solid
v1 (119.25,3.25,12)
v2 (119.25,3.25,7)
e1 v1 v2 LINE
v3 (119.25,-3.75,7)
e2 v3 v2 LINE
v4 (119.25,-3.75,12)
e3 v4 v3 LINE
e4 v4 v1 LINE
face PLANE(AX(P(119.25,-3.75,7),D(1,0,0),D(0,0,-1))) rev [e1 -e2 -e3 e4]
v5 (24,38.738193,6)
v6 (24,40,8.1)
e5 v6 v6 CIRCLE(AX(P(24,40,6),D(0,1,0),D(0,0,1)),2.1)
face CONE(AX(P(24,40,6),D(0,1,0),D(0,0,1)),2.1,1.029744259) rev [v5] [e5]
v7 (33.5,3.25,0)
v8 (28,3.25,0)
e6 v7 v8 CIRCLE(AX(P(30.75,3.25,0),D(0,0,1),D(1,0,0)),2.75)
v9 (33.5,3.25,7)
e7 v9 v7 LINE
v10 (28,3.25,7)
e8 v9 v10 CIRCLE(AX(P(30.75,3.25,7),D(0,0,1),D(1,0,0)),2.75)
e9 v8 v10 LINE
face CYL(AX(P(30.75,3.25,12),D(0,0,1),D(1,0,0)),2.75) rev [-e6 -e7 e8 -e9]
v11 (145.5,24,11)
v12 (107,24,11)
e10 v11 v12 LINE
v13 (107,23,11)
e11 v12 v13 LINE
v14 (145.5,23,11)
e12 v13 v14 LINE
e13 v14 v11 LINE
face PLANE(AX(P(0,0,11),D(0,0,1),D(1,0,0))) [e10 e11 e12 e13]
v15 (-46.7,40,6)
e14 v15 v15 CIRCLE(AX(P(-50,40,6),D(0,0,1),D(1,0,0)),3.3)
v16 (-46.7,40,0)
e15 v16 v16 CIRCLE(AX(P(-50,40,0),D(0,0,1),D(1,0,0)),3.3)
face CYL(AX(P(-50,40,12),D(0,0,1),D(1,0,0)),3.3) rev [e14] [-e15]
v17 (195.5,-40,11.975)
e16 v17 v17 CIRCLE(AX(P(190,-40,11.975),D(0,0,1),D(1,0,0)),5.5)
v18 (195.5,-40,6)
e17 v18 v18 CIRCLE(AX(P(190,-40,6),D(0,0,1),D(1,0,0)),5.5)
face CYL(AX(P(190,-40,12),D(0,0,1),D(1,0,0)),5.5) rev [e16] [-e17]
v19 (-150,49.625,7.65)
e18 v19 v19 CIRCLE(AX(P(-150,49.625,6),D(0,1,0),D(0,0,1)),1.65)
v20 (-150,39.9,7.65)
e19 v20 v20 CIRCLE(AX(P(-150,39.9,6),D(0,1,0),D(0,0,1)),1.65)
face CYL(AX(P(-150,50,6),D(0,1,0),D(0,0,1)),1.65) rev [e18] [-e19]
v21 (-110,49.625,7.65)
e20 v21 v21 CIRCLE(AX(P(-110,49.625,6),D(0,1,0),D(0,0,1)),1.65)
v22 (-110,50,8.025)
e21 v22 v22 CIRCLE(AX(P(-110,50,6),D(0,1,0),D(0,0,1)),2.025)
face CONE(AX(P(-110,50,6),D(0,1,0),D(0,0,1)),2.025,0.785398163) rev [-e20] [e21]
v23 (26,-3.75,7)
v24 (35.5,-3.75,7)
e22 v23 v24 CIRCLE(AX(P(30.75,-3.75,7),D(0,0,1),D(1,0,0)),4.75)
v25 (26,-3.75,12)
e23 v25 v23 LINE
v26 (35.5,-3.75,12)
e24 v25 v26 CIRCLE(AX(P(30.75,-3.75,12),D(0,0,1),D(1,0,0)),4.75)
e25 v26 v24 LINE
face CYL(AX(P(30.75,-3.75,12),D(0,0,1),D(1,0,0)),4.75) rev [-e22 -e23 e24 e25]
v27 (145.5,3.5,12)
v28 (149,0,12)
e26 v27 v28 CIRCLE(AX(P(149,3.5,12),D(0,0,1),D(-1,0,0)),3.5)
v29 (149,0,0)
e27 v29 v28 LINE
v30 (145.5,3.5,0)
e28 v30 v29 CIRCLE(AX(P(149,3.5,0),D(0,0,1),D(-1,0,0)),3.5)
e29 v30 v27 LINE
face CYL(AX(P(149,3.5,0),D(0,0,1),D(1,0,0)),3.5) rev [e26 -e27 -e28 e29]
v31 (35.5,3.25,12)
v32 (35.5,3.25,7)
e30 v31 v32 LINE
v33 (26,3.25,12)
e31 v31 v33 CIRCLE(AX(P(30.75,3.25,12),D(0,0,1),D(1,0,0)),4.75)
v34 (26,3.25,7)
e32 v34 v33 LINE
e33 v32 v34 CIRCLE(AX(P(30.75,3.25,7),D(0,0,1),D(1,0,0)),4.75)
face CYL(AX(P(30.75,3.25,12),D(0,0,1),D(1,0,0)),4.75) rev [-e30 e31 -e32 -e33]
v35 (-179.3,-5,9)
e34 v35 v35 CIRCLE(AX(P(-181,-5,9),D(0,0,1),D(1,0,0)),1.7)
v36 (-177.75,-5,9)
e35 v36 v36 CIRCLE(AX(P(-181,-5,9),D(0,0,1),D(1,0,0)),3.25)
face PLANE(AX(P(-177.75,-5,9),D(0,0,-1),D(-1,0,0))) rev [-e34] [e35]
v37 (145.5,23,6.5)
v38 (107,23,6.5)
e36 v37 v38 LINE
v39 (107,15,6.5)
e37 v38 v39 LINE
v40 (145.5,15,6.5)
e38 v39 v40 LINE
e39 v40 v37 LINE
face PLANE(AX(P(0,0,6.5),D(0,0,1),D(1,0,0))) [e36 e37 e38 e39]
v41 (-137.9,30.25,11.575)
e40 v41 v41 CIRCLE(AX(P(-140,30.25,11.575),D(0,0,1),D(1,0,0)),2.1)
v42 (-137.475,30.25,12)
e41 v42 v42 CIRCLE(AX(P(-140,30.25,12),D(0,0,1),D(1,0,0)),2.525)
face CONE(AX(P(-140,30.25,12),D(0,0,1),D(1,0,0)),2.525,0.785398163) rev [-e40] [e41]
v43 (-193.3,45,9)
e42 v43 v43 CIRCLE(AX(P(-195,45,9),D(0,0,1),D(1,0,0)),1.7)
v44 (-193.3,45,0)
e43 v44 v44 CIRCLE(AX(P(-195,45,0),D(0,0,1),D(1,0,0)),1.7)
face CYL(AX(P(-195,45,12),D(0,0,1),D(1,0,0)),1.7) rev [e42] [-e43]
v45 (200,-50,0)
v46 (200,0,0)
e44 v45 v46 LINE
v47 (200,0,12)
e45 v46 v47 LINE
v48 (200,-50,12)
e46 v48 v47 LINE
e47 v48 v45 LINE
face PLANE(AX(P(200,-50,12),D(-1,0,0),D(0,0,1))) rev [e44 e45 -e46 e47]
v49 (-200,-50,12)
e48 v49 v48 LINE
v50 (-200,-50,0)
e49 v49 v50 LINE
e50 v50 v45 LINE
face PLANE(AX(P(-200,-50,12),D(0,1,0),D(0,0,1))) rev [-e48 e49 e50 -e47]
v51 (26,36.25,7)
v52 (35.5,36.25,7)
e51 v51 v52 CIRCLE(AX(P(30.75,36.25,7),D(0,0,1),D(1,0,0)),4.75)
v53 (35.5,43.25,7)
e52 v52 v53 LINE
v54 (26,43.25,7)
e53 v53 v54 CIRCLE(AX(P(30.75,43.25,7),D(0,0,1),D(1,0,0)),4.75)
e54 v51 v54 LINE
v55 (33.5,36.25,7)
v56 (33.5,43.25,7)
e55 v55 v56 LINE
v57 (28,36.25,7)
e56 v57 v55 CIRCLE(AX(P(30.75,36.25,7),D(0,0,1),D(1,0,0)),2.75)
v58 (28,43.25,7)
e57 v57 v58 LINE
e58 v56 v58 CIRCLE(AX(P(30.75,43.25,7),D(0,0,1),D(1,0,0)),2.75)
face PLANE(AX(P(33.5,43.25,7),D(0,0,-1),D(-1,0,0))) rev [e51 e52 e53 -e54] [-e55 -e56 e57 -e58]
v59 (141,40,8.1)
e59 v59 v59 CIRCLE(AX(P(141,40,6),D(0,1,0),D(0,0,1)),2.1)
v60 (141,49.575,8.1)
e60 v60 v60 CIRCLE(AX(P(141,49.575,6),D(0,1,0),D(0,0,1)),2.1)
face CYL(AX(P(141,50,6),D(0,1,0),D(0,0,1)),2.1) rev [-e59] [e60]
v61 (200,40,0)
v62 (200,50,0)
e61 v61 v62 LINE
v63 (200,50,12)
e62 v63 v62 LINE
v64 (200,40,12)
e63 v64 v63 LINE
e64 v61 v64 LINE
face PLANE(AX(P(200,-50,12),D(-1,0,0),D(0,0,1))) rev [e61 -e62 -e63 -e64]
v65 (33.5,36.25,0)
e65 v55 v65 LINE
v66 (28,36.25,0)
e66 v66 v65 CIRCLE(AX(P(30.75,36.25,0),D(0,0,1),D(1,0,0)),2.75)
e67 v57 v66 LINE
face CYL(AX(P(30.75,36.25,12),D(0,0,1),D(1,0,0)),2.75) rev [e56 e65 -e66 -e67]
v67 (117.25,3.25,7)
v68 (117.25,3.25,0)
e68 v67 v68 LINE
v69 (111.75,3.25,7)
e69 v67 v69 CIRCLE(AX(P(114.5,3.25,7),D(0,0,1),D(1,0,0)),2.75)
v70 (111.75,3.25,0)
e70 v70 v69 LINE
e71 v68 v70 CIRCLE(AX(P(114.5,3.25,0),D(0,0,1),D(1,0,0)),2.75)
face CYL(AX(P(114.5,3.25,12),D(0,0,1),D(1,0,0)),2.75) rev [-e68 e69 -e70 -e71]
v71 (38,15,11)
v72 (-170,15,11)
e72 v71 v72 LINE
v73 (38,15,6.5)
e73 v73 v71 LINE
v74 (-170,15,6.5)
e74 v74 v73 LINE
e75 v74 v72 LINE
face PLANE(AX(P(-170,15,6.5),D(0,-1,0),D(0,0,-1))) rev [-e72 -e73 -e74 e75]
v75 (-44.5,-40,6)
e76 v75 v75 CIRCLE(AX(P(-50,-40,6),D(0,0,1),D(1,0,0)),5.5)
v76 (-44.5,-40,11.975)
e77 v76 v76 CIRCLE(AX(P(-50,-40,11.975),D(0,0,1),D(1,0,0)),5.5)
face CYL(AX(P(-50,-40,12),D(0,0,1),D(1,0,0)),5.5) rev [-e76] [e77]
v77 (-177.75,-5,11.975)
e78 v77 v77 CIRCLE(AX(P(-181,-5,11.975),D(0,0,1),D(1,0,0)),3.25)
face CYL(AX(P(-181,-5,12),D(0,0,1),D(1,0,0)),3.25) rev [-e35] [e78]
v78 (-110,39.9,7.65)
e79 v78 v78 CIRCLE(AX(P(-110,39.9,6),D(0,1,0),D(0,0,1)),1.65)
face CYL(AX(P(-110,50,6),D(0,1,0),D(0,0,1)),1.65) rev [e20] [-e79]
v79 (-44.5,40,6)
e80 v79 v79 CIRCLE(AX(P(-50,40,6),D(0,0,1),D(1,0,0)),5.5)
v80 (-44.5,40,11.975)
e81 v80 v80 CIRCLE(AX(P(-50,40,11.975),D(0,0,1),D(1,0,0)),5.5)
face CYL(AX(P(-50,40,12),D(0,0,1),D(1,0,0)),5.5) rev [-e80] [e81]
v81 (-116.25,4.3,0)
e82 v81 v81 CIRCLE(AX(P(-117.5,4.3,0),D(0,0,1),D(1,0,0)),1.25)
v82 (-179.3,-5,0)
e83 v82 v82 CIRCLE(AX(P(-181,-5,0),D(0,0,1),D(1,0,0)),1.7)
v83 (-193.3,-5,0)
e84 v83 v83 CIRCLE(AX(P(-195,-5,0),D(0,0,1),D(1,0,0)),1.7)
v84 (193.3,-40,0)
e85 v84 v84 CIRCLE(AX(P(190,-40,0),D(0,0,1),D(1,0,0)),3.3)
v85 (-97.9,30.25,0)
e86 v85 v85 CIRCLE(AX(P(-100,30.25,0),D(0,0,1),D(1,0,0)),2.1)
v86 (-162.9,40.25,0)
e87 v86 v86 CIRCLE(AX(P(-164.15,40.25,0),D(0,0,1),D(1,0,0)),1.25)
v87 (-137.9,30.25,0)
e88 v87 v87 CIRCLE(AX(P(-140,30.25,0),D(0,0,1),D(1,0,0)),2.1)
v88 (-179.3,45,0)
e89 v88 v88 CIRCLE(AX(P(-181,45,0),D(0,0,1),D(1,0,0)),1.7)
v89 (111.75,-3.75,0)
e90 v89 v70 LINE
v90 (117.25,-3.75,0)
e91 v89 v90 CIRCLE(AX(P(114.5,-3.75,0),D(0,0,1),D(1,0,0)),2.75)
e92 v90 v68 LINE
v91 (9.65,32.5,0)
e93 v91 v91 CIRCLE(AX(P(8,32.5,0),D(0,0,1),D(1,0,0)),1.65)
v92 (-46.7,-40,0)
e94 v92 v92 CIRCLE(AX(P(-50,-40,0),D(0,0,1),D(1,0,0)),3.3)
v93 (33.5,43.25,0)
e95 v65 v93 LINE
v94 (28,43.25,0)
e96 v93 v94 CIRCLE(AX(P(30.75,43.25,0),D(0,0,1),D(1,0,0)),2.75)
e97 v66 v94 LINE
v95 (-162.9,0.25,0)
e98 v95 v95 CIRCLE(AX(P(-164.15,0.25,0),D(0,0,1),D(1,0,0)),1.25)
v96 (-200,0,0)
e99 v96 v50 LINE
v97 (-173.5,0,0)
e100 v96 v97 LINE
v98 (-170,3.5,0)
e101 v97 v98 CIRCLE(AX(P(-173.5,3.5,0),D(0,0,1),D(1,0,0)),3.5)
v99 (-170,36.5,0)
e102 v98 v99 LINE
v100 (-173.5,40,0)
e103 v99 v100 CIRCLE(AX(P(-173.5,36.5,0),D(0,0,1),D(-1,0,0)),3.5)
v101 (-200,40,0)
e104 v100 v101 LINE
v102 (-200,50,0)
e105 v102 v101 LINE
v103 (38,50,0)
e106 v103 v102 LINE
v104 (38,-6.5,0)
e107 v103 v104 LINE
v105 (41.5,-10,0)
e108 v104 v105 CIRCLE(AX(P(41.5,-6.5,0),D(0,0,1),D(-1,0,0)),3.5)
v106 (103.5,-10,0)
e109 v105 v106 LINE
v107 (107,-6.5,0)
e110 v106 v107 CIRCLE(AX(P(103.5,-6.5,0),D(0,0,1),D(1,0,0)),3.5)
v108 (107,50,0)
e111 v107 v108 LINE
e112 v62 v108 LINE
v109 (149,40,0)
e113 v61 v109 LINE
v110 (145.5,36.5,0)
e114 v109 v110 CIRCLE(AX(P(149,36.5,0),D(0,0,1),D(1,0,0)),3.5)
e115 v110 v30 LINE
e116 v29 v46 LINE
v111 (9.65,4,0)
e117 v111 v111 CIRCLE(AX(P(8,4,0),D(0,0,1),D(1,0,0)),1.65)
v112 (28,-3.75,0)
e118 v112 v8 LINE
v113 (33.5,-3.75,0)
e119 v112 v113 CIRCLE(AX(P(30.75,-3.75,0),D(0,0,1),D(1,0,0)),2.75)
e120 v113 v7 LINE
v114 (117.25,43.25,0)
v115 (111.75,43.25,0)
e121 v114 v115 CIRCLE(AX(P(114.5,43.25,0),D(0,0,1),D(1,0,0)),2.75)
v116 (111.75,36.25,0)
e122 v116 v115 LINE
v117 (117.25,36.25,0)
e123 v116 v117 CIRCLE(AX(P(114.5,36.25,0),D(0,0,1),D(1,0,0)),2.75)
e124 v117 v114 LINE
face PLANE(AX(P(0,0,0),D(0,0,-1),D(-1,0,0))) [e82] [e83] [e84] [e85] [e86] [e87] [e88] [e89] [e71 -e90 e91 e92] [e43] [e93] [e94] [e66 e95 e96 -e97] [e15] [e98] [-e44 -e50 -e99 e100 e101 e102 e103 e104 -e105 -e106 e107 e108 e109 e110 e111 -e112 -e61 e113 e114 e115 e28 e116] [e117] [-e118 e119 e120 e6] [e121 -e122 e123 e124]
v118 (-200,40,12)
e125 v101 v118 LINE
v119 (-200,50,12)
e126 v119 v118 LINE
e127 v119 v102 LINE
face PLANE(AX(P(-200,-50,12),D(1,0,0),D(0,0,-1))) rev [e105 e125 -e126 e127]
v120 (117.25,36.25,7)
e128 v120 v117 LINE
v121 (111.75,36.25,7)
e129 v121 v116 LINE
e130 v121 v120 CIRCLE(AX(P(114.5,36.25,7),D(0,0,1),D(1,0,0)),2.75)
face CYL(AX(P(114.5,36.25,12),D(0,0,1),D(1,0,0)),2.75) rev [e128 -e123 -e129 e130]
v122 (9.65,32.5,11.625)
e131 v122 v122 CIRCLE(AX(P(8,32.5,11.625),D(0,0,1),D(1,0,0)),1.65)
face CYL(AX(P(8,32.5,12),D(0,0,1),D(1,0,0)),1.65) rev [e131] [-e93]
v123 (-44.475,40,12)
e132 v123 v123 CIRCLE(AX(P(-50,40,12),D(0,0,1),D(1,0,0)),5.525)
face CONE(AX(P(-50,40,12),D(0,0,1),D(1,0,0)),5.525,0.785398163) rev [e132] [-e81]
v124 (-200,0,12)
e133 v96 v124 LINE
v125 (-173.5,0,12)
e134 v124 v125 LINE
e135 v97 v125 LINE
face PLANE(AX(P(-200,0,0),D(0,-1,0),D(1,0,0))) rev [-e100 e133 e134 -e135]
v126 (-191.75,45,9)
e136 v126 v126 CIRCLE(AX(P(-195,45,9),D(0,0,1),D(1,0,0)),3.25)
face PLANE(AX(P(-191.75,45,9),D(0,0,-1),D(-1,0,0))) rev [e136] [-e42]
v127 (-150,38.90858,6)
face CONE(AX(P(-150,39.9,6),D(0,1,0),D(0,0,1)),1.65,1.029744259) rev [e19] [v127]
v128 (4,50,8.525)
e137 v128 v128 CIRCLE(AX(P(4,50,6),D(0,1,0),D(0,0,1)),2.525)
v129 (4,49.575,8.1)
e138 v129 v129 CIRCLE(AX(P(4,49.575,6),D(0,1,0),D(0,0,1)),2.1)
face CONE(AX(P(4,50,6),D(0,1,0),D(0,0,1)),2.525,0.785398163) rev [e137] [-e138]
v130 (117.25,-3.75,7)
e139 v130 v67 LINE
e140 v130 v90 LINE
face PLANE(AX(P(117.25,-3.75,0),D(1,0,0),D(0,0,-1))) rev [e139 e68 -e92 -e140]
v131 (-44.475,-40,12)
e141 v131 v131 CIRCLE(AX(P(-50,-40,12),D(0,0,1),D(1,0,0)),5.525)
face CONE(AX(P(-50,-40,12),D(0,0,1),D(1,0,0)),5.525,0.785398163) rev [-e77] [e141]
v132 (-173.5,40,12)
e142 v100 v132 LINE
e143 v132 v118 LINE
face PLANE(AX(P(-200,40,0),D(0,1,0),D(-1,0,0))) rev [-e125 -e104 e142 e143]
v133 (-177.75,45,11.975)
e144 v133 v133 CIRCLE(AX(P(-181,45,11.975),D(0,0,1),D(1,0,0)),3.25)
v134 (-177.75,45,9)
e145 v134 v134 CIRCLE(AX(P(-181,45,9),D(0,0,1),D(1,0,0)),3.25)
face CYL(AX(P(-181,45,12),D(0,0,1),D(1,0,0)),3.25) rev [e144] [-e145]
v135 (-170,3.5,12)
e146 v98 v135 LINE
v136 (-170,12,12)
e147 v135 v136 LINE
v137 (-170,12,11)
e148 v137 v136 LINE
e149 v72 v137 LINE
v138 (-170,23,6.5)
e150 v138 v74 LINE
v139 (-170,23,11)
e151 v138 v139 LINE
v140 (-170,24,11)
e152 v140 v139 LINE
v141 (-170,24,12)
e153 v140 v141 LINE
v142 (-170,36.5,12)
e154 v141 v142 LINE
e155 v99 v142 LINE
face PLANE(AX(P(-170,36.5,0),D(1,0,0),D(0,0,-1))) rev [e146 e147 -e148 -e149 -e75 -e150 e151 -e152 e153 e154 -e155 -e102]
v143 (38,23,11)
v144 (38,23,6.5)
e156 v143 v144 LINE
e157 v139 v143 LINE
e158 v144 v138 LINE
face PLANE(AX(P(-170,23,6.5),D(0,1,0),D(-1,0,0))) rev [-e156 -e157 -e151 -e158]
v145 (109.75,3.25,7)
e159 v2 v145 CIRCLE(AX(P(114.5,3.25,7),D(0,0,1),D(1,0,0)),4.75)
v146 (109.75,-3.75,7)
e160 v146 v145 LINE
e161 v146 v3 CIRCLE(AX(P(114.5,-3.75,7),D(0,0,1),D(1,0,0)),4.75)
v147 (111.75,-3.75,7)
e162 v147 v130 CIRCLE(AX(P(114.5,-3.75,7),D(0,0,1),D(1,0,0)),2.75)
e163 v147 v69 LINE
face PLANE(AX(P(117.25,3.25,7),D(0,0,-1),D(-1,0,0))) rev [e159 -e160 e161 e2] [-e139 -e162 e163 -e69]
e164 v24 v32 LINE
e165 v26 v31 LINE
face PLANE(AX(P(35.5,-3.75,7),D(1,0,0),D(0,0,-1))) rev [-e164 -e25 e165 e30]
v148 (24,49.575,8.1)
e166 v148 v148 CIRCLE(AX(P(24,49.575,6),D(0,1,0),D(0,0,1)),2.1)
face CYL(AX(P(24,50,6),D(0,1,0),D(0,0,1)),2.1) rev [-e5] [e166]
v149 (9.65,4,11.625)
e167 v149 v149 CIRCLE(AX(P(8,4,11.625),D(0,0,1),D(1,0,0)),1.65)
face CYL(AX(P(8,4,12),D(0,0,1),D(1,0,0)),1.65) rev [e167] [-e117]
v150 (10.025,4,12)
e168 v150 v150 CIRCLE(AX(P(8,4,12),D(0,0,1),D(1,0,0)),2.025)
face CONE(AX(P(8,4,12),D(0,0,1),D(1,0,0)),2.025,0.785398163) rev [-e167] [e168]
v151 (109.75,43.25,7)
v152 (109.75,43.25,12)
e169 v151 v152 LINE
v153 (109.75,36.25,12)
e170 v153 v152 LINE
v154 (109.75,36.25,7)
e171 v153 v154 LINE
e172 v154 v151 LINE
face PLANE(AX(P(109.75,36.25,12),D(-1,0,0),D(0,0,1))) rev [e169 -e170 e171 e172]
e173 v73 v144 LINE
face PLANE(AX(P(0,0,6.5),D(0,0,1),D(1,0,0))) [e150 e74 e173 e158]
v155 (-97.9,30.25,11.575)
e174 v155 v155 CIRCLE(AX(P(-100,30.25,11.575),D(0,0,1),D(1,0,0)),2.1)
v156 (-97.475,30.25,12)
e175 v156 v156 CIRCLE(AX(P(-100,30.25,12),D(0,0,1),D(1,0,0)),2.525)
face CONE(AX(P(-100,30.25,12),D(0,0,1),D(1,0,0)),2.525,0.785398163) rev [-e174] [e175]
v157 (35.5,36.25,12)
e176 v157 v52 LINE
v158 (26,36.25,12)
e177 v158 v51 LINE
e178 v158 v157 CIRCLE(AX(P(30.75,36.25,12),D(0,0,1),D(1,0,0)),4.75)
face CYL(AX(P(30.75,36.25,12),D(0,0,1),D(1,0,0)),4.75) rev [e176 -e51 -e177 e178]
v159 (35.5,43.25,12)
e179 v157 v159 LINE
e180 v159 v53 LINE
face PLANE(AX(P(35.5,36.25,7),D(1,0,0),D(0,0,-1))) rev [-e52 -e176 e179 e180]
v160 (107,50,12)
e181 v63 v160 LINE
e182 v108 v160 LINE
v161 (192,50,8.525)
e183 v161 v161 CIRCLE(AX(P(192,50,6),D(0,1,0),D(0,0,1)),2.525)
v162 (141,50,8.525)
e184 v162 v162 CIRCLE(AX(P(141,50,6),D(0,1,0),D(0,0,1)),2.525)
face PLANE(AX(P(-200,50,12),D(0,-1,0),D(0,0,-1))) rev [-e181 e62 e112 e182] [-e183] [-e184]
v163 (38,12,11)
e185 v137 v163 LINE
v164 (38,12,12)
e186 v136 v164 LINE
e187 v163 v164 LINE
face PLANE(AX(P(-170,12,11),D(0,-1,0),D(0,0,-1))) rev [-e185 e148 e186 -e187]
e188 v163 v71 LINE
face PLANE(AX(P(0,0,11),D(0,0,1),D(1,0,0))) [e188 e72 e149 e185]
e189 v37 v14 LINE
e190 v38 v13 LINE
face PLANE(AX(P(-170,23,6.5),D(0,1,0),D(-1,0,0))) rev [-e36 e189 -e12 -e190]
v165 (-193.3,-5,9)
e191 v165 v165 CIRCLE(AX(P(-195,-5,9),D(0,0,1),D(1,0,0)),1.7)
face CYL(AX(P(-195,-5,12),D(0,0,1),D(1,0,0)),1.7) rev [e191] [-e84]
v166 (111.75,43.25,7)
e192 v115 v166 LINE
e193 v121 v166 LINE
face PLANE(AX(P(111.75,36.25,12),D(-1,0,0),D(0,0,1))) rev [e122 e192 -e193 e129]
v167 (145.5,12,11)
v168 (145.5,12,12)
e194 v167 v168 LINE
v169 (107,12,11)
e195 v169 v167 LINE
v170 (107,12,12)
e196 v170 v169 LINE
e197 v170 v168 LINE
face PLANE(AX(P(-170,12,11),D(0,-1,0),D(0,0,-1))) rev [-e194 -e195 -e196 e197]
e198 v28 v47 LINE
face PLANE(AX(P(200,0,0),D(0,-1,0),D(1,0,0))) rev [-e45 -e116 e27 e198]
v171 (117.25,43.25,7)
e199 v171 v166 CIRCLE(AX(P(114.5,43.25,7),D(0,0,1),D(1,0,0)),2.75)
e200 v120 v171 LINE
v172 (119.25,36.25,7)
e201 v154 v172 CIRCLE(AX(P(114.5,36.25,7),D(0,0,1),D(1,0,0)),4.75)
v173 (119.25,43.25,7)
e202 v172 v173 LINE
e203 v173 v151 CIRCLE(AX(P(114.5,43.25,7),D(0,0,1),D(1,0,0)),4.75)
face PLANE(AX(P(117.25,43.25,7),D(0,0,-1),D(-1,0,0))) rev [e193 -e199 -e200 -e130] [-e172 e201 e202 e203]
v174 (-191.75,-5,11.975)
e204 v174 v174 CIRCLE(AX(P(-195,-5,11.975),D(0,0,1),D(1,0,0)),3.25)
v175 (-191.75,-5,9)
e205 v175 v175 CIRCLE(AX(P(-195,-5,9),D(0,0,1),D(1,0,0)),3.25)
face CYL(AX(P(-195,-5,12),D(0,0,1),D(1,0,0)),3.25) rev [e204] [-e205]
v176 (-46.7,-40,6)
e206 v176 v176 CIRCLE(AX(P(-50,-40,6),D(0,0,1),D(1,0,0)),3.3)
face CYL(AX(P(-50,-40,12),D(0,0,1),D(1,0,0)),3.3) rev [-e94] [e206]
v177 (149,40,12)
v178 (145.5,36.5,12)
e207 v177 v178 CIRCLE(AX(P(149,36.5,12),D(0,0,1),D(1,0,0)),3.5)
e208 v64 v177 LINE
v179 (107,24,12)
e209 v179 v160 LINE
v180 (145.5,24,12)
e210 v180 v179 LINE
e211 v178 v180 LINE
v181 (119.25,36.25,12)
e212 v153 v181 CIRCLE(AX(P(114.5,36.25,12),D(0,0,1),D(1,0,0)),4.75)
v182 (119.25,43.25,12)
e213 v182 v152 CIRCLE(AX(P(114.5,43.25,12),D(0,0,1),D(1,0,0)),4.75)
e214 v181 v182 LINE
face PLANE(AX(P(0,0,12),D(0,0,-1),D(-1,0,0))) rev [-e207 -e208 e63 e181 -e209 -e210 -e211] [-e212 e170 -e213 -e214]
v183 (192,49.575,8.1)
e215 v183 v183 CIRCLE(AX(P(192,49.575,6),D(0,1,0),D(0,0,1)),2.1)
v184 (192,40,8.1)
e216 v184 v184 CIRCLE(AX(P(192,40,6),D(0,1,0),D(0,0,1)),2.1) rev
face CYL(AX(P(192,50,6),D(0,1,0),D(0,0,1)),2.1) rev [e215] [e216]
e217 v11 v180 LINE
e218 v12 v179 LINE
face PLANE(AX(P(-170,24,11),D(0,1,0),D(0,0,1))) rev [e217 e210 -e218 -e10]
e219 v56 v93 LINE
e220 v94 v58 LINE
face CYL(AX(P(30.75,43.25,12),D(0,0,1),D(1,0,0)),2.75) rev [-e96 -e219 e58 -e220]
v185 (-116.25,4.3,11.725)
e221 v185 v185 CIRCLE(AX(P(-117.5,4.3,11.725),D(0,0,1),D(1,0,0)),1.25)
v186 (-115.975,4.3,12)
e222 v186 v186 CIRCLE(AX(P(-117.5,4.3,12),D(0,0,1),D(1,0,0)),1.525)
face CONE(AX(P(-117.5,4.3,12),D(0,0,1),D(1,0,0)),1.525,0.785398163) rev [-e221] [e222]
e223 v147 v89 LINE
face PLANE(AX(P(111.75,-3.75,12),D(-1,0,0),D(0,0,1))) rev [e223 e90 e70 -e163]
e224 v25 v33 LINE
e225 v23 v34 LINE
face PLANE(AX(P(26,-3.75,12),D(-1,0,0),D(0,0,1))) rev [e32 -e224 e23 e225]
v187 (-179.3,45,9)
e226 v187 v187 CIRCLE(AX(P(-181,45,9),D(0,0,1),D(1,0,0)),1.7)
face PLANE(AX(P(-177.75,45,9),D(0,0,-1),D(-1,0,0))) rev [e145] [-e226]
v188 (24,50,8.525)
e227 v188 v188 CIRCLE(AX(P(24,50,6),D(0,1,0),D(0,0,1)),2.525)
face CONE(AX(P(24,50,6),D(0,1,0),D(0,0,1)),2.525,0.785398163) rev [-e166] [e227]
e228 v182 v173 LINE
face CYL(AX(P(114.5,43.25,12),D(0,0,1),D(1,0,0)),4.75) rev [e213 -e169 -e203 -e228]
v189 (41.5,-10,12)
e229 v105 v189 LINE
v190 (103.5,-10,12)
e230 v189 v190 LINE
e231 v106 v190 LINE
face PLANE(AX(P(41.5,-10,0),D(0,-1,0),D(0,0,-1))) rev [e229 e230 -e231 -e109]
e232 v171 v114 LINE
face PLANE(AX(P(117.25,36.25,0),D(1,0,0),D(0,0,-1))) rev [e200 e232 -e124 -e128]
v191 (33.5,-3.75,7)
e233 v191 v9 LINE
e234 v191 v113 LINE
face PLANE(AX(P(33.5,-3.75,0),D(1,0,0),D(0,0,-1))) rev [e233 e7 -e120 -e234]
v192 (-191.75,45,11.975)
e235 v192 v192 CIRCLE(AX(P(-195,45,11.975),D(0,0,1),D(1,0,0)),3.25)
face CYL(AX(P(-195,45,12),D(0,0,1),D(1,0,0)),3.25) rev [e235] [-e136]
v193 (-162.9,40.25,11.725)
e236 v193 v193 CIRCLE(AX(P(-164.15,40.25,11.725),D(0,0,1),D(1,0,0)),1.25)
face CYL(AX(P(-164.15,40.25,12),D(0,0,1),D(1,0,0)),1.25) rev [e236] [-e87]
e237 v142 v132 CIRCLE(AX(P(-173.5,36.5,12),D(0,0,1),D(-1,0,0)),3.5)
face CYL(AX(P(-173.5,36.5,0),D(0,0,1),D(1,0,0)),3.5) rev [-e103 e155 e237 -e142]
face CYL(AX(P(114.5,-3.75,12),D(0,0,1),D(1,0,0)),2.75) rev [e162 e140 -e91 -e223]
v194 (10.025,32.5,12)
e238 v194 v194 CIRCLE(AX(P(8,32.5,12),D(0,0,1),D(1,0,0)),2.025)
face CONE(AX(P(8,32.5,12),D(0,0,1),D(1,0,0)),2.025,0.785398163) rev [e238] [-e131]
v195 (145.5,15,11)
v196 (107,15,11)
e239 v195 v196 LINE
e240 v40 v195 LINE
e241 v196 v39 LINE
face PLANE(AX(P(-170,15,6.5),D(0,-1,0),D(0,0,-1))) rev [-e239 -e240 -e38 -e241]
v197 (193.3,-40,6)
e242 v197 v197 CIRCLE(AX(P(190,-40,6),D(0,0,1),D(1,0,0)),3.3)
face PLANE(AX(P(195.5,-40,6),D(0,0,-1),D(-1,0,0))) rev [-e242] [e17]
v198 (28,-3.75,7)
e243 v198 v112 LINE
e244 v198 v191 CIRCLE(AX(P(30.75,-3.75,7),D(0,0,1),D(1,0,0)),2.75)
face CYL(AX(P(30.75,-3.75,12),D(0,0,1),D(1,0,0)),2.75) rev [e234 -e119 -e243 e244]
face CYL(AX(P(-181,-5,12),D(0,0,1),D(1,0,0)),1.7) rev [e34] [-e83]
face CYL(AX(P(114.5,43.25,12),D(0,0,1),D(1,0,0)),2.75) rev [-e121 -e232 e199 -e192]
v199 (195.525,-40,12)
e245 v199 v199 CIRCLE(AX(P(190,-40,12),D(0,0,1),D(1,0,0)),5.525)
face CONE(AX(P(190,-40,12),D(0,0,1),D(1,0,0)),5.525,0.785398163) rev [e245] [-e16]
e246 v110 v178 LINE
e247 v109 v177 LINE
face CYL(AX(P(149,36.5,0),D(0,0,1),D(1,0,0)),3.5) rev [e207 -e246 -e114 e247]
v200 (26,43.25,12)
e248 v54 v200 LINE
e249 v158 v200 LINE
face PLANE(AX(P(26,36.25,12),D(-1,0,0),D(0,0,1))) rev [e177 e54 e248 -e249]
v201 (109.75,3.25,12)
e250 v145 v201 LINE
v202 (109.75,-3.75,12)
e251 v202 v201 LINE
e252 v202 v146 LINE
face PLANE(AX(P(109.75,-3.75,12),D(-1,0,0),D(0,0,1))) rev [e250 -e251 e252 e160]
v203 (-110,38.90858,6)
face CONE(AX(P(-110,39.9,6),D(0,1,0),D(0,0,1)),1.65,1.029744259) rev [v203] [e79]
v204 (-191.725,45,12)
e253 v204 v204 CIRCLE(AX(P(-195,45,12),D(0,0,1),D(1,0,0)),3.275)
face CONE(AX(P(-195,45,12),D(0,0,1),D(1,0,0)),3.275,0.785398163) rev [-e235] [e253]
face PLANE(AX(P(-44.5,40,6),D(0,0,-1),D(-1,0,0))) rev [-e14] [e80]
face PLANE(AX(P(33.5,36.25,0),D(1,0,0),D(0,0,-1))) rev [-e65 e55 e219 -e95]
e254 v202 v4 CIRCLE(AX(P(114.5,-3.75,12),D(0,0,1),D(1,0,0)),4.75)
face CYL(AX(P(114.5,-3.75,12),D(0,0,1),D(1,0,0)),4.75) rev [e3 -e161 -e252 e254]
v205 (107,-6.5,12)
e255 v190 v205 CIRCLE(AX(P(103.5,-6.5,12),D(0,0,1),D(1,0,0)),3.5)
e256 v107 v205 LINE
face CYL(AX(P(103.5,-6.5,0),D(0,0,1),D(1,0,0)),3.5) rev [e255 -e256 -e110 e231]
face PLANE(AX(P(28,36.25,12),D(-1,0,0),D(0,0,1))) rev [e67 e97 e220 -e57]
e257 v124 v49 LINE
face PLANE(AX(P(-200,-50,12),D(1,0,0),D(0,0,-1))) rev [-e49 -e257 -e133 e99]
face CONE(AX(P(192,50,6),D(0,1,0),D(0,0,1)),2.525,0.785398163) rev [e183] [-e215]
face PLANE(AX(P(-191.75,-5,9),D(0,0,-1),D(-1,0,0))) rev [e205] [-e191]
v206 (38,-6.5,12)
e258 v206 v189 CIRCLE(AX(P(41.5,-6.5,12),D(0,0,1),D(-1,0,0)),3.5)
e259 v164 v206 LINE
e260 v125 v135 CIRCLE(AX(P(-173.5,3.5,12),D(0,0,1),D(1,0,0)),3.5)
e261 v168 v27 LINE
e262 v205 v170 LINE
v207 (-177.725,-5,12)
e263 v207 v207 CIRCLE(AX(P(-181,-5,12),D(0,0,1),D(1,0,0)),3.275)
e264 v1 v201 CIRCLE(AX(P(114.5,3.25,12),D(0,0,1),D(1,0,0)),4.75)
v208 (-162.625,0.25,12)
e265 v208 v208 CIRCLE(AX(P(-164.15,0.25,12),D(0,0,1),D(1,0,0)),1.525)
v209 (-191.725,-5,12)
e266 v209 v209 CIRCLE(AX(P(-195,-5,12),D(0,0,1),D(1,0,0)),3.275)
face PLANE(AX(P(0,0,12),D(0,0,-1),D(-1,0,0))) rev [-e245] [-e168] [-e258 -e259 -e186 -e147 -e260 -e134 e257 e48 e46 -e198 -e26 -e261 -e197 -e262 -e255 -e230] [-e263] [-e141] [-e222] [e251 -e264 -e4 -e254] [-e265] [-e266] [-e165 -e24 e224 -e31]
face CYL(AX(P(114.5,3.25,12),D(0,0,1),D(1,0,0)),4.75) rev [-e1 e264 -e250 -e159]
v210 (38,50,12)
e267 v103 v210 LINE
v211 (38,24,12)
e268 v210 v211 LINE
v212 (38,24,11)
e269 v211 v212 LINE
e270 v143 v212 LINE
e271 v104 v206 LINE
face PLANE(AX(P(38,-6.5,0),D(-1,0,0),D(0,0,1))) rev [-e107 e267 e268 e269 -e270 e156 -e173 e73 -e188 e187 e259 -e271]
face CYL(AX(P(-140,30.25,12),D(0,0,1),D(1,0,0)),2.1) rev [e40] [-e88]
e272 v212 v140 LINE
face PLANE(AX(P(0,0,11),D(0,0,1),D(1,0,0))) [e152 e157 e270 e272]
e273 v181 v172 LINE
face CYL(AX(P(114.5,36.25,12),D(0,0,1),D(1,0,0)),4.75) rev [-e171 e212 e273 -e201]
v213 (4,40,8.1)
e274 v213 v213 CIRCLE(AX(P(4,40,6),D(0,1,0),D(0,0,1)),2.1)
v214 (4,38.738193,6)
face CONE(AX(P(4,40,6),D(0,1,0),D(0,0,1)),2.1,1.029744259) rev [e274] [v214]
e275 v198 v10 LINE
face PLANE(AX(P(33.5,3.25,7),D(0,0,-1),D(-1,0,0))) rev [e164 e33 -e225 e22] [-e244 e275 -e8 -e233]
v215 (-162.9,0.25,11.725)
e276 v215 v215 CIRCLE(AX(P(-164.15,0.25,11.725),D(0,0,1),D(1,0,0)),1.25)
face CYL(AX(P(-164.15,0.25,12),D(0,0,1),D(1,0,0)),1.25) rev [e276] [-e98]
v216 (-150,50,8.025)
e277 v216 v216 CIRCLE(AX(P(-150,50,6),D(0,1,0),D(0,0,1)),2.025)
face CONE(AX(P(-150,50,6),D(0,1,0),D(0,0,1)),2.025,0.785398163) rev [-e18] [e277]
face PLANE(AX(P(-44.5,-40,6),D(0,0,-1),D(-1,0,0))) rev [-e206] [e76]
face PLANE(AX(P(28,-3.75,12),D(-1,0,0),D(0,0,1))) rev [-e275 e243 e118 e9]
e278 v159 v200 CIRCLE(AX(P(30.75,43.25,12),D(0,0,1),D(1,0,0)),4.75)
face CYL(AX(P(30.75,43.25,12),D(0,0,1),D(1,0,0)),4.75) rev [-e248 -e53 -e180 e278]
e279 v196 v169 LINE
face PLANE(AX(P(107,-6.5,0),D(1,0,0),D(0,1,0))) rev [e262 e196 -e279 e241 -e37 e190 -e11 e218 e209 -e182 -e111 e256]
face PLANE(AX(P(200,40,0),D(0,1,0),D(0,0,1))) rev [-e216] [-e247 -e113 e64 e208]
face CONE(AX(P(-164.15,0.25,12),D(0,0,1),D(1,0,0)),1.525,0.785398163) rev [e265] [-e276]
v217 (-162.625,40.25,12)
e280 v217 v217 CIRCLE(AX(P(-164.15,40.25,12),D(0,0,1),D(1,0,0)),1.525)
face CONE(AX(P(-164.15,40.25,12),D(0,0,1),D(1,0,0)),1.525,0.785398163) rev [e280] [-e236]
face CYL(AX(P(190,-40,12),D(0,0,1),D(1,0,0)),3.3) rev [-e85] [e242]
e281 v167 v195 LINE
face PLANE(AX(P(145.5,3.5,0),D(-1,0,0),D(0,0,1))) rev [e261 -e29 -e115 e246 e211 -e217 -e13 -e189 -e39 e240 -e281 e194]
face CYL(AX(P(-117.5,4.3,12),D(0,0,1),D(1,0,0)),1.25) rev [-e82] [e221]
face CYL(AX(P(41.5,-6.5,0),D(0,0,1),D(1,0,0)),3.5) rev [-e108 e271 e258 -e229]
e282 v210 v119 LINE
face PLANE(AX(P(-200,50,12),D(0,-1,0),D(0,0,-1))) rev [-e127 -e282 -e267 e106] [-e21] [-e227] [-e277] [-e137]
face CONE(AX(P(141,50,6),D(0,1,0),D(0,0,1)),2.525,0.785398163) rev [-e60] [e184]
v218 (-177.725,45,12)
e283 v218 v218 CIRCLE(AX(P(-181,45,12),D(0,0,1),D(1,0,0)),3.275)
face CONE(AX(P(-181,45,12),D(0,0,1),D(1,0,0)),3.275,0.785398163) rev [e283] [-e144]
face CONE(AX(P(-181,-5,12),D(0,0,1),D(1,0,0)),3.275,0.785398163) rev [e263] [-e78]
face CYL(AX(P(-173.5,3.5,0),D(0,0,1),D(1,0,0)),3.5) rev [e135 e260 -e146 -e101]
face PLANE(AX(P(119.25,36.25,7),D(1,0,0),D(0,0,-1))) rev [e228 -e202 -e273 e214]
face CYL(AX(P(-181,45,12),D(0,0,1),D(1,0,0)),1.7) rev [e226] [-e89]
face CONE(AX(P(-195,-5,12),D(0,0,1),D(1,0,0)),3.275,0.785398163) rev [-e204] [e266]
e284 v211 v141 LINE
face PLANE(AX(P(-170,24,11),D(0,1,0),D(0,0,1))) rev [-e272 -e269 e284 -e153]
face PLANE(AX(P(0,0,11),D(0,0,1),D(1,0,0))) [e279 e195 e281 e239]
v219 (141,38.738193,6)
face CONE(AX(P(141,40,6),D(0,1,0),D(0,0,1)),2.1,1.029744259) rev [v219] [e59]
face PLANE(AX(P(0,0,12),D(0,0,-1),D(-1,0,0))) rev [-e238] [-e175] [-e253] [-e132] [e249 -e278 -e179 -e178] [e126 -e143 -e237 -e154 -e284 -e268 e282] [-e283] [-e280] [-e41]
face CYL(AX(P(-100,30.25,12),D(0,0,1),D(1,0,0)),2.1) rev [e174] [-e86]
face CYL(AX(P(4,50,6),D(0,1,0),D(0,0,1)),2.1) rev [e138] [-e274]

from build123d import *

# Parameters (mm, degrees)
SKETCH1_W                       = 400
SKETCH1_H                       = 100
BASE_DEPTH                      = 12
PART_TAPE_MOVER_CUTOUT_DEPTH    = 207.504237245
PRESS_PLATE_CUTOUT_DEPTH        = 207.504237245
ROLLER_CUTOUT_DEPTH             = 207.504237245
SKETCH5_W                       = 315.5
SKETCH5_H                       = 8
PART_TAPE_CUTOUT_DEPTH          = 5.5
SKETCH6_W                       = 315.5
SKETCH6_H                       = 12
PART_TAPE_REST_DEPTH            = 1
CBORE_FOR_M6_SHCS1_AT_2_COUNT   = 2
CBORE_FOR_M6_SHCS1_AT_2_PITCH   = 240
CBORE_FOR_M6_SHCS1_AT_3_COUNT   = 2
CBORE_FOR_M6_SHCS1_AT_3_PITCH   = 252.982212813
LPATTERN2_COUNT                 = 2
LPATTERN2_PITCH                 = 14
LPATTERN2_COUNT_DIR2            = 2
LPATTERN2_PITCH_DIR2            = 50
M5X0_8_TAPPED_HOLE1_D           = 4.2
M5X0_8_TAPPED_HOLE1_DEPTH       = 10
M5X0_8_TAPPED_HOLE1_CSINK_D     = 5.05
M5X0_8_TAPPED_HOLE1_CSINK_ANGLE = 90
M5X0_8_TAPPED_HOLE1_TIP         = 1.2618073
M4X0_7_TAPPED_HOLE1_D           = 3.3
M4X0_7_TAPPED_HOLE1_DEPTH       = 10.1
M4X0_7_TAPPED_HOLE1_CSINK_D     = 4.05
M4X0_7_TAPPED_HOLE1_CSINK_ANGLE = 90
M4X0_7_TAPPED_HOLE1_TIP         = 0.991420021
M3X0_5_TAPPED_HOLE1_D           = 2.5
M3X0_5_TAPPED_HOLE1_CSINK_D     = 3.05
M3X0_5_TAPPED_HOLE1_CSINK_ANGLE = 90
M5X0_8_TAPPED_HOLE2_D           = 4.2
M5X0_8_TAPPED_HOLE2_CSINK_D     = 5.05
M5X0_8_TAPPED_HOLE2_CSINK_ANGLE = 90
M4X0_7_TAPPED_HOLE2_D           = 3.3
M4X0_7_TAPPED_HOLE2_CSINK_D     = 4.05
M4X0_7_TAPPED_HOLE2_CSINK_ANGLE = 90
CBORE_SLOT_FOR_M5_SHCS2_DEPTH   = 12
CBORE_START                     = 7
CBORE_SLOT_FOR_M5_SHCS2_2_DEPTH = 5
LPATTERN3_COUNT                 = 2
LPATTERN3_PITCH                 = 83.75
LPATTERN3_COUNT_DIR2            = 2
LPATTERN3_PITCH_DIR2            = 40


# Read off the part's stored shape, not the designer's step: CBORE SLOT for M5 SHCS2
with BuildPart() as part:
    # Sketch1 → Base (new body)
    with BuildSketch(Plane.XY):
        Rectangle(SKETCH1_W, SKETCH1_H)
    extrude(amount=BASE_DEPTH)

    # Sketch2 → Part Tape Mover Cutout (cut, through all)
    with BuildSketch(Plane.XY.offset(12)):
        with BuildLine():
            Line((200, 0), (149, 0))
            ThreePointArc((149, 0), (146.525126266, 1.025126266), (145.5, 3.5))
            Line((145.5, 3.5), (145.5, 36.5))
            ThreePointArc((145.5, 36.5), (146.525126266, 38.974873734), (149, 40))
            Line((149, 40), (200, 40))
            Line((200, 40), (200, 0))
        make_face()
    extrude(amount=-PART_TAPE_MOVER_CUTOUT_DEPTH, mode=Mode.SUBTRACT)

    # Sketch3 → Press Plate Cutout (cut, through all)
    with BuildSketch(Plane.XY.offset(12)):
        with BuildLine():
            Line((41.5, -10), (103.5, -10))
            ThreePointArc((103.5, -10), (105.974873734, -8.974873734), (107, -6.5))
            Line((107, -6.5), (107, 50))
            Line((107, 50), (38, 50))
            Line((38, 50), (38, -6.5))
            ThreePointArc((38, -6.5), (39.025126266, -8.974873734), (41.5, -10))
        make_face()
    extrude(amount=-PRESS_PLATE_CUTOUT_DEPTH, mode=Mode.SUBTRACT)

    # Sketch4 → Roller Cutout (cut, through all)
    with BuildSketch(Plane.XY.offset(12)):
        with BuildLine():
            Line((-200, 40), (-173.5, 40))
            ThreePointArc((-173.5, 40), (-171.025126266, 38.974873734), (-170, 36.5))
            Line((-170, 36.5), (-170, 3.5))
            ThreePointArc((-170, 3.5), (-171.025126266, 1.025126266), (-173.5, 0))
            Line((-173.5, 0), (-200, 0))
            Line((-200, 0), (-200, 40))
        make_face()
    extrude(amount=-ROLLER_CUTOUT_DEPTH, mode=Mode.SUBTRACT)

    # Sketch5 → Part Tape Cutout (cut)
    with BuildSketch(Plane.XY.offset(12)):
        with Locations((-12.25, 19)):
            Rectangle(SKETCH5_W, SKETCH5_H)
    extrude(amount=-PART_TAPE_CUTOUT_DEPTH, mode=Mode.SUBTRACT)

    # Sketch6 → Part Tape Rest (cut)
    with BuildSketch(Plane.XY.offset(12)):
        with Locations((-12.25, 18)):
            Rectangle(SKETCH6_W, SKETCH6_H)
    extrude(amount=-PART_TAPE_REST_DEPTH, mode=Mode.SUBTRACT)

    # Sketch16 → CBORE for M6 SHCS1 (revolve, cut)
    with BuildSketch(Plane(origin=(190, -40, 12), x_dir=(0, -1, 0), z_dir=(1, 0, 0))):
        Polygon((0, 0), (0, 12), (3.3, 12), (3.3, 6), (5.5, 6), (5.5, 0.025), (5.525, 0), align=None)
    cbore_for_m6_shcs1 = revolve(axis=Axis((190, -40, 18.35), (0, 0, -1)), mode=Mode.SUBTRACT)

    # CBORE for M6 SHCS1 at 2: CBORE for M6 SHCS1 ×2
    with Locations(*[(-i * CBORE_FOR_M6_SHCS1_AT_2_PITCH, 0, 0) for i in range(1, CBORE_FOR_M6_SHCS1_AT_2_COUNT)]):
        add(cbore_for_m6_shcs1, mode=Mode.SUBTRACT)

    # CBORE for M6 SHCS1 at 3: CBORE for M6 SHCS1 ×2
    with Locations(*[Vector(-0.9486832980505139, 0.316227766016838, 0) * (i * CBORE_FOR_M6_SHCS1_AT_3_PITCH) for i in range(1, CBORE_FOR_M6_SHCS1_AT_3_COUNT)]):
        add(cbore_for_m6_shcs1, mode=Mode.SUBTRACT)

    # Sketch18 → CBORE for M3 SHCS2 (revolve, cut)
    with BuildSketch(Plane(origin=(-195, 45, 12), x_dir=(0, -1, 0), z_dir=(1, 0, 0))):
        Polygon((0, 0), (0, 12), (1.7, 12), (1.7, 3), (3.25, 3), (3.25, 0.025), (3.275, 0), align=None)
    cbore_for_m3_shcs2 = revolve(axis=Axis((-195, 45, 18.35), (0, 0, -1)), mode=Mode.SUBTRACT)

    # LPattern2: CBORE for M3 SHCS2 2 × 2
    with Locations(*[(i * LPATTERN2_PITCH, -j * LPATTERN2_PITCH_DIR2, 0) for i in range(LPATTERN2_COUNT) for j in range(LPATTERN2_COUNT_DIR2) if (i, j) != (0, 0)]):
        add(cbore_for_m3_shcs2, mode=Mode.SUBTRACT)

    # M5x0.8 Tapped Hole1
    with Locations(Plane(origin=(0, 50, 0), x_dir=(1, 0, 0), z_dir=(0, 1, 0))):
        with Locations((192, -6), (141, -6), (24, -6), (4, -6)):
            CounterSinkHole(M5X0_8_TAPPED_HOLE1_D / 2, M5X0_8_TAPPED_HOLE1_CSINK_D / 2, depth=M5X0_8_TAPPED_HOLE1_DEPTH, counter_sink_angle=M5X0_8_TAPPED_HOLE1_CSINK_ANGLE)
            with Locations((0, 0, -(M5X0_8_TAPPED_HOLE1_DEPTH + M5X0_8_TAPPED_HOLE1_TIP / 2))):  # 118° drill point
                Cone(0, M5X0_8_TAPPED_HOLE1_D / 2, M5X0_8_TAPPED_HOLE1_TIP, mode=Mode.SUBTRACT)

    # M4x0.7 Tapped Hole1
    with Locations(Plane(origin=(0, 50, 0), x_dir=(1, 0, 0), z_dir=(0, 1, 0))):
        with Locations((-150, -6), (-110, -6)):
            CounterSinkHole(M4X0_7_TAPPED_HOLE1_D / 2, M4X0_7_TAPPED_HOLE1_CSINK_D / 2, depth=M4X0_7_TAPPED_HOLE1_DEPTH, counter_sink_angle=M4X0_7_TAPPED_HOLE1_CSINK_ANGLE)
            with Locations((0, 0, -(M4X0_7_TAPPED_HOLE1_DEPTH + M4X0_7_TAPPED_HOLE1_TIP / 2))):  # 118° drill point
                Cone(0, M4X0_7_TAPPED_HOLE1_D / 2, M4X0_7_TAPPED_HOLE1_TIP, mode=Mode.SUBTRACT)

    # M3x0.5 Tapped Hole1 (through all)
    with Locations(Plane.XY.offset(12)):
        with Locations((-164.15, 40.25), (-117.5, 4.3), (-164.15, 0.25)):
            CounterSinkHole(M3X0_5_TAPPED_HOLE1_D / 2, M3X0_5_TAPPED_HOLE1_CSINK_D / 2, counter_sink_angle=M3X0_5_TAPPED_HOLE1_CSINK_ANGLE)

    # M5x0.8 Tapped Hole2 (through all)
    with Locations(Plane.XY.offset(12)):
        with Locations((-140, 30.25), (-100, 30.25)):
            CounterSinkHole(M5X0_8_TAPPED_HOLE2_D / 2, M5X0_8_TAPPED_HOLE2_CSINK_D / 2, counter_sink_angle=M5X0_8_TAPPED_HOLE2_CSINK_ANGLE)

    # M4x0.7 Tapped Hole2 (through all)
    with Locations(Plane.XY.offset(12)):
        with Locations((8, 32.5), (8, 4)):
            CounterSinkHole(M4X0_7_TAPPED_HOLE2_D / 2, M4X0_7_TAPPED_HOLE2_CSINK_D / 2, counter_sink_angle=M4X0_7_TAPPED_HOLE2_CSINK_ANGLE)

    # CBORE SLOT for M5 SHCS2 outline → CBORE SLOT for M5 SHCS2 (cut)
    with BuildSketch(Plane.XY):
        with BuildLine():
            Line((117.25, 36.25), (117.25, 43.25))
            ThreePointArc((117.25, 43.25), (114.5, 46), (111.75, 43.25))
            Line((111.75, 43.25), (111.75, 36.25))
            ThreePointArc((111.75, 36.25), (114.5, 33.5), (117.25, 36.25))
        make_face()
    cbore_slot_for_m5_shcs2 = extrude(amount=CBORE_SLOT_FOR_M5_SHCS2_DEPTH, mode=Mode.SUBTRACT)

    # CBORE SLOT for M5 SHCS2 2 outline → CBORE SLOT for M5 SHCS2 2 (cut)
    with BuildSketch(Plane.XY.offset(CBORE_START)):
        with BuildLine():
            Line((119.25, 36.25), (119.25, 43.25))
            ThreePointArc((119.25, 43.25), (114.5, 48), (109.75, 43.25))
            Line((109.75, 43.25), (109.75, 36.25))
            ThreePointArc((109.75, 36.25), (114.5, 31.5), (119.25, 36.25))
        make_face()
        with BuildLine():
            ThreePointArc((111.75, 43.25), (114.5, 46), (117.25, 43.25))
            Line((117.25, 43.25), (117.25, 36.25))
            ThreePointArc((117.25, 36.25), (114.5, 33.5), (111.75, 36.25))
            Line((111.75, 36.25), (111.75, 43.25))
        make_face(mode=Mode.SUBTRACT)
    cbore_slot_for_m5_shcs2_2 = extrude(amount=CBORE_SLOT_FOR_M5_SHCS2_2_DEPTH, mode=Mode.SUBTRACT)

    # LPattern3: CBORE SLOT for M5 SHCS2, CBORE SLOT for M5 SHCS2 2 2 × 2
    with Locations(*[(-i * LPATTERN3_PITCH, -j * LPATTERN3_PITCH_DIR2, 0) for i in range(LPATTERN3_COUNT) for j in range(LPATTERN3_COUNT_DIR2) if (i, j) != (0, 0)]):
        add(cbore_slot_for_m5_shcs2, mode=Mode.SUBTRACT)
        add(cbore_slot_for_m5_shcs2_2, mode=Mode.SUBTRACT)


solid = part.part
